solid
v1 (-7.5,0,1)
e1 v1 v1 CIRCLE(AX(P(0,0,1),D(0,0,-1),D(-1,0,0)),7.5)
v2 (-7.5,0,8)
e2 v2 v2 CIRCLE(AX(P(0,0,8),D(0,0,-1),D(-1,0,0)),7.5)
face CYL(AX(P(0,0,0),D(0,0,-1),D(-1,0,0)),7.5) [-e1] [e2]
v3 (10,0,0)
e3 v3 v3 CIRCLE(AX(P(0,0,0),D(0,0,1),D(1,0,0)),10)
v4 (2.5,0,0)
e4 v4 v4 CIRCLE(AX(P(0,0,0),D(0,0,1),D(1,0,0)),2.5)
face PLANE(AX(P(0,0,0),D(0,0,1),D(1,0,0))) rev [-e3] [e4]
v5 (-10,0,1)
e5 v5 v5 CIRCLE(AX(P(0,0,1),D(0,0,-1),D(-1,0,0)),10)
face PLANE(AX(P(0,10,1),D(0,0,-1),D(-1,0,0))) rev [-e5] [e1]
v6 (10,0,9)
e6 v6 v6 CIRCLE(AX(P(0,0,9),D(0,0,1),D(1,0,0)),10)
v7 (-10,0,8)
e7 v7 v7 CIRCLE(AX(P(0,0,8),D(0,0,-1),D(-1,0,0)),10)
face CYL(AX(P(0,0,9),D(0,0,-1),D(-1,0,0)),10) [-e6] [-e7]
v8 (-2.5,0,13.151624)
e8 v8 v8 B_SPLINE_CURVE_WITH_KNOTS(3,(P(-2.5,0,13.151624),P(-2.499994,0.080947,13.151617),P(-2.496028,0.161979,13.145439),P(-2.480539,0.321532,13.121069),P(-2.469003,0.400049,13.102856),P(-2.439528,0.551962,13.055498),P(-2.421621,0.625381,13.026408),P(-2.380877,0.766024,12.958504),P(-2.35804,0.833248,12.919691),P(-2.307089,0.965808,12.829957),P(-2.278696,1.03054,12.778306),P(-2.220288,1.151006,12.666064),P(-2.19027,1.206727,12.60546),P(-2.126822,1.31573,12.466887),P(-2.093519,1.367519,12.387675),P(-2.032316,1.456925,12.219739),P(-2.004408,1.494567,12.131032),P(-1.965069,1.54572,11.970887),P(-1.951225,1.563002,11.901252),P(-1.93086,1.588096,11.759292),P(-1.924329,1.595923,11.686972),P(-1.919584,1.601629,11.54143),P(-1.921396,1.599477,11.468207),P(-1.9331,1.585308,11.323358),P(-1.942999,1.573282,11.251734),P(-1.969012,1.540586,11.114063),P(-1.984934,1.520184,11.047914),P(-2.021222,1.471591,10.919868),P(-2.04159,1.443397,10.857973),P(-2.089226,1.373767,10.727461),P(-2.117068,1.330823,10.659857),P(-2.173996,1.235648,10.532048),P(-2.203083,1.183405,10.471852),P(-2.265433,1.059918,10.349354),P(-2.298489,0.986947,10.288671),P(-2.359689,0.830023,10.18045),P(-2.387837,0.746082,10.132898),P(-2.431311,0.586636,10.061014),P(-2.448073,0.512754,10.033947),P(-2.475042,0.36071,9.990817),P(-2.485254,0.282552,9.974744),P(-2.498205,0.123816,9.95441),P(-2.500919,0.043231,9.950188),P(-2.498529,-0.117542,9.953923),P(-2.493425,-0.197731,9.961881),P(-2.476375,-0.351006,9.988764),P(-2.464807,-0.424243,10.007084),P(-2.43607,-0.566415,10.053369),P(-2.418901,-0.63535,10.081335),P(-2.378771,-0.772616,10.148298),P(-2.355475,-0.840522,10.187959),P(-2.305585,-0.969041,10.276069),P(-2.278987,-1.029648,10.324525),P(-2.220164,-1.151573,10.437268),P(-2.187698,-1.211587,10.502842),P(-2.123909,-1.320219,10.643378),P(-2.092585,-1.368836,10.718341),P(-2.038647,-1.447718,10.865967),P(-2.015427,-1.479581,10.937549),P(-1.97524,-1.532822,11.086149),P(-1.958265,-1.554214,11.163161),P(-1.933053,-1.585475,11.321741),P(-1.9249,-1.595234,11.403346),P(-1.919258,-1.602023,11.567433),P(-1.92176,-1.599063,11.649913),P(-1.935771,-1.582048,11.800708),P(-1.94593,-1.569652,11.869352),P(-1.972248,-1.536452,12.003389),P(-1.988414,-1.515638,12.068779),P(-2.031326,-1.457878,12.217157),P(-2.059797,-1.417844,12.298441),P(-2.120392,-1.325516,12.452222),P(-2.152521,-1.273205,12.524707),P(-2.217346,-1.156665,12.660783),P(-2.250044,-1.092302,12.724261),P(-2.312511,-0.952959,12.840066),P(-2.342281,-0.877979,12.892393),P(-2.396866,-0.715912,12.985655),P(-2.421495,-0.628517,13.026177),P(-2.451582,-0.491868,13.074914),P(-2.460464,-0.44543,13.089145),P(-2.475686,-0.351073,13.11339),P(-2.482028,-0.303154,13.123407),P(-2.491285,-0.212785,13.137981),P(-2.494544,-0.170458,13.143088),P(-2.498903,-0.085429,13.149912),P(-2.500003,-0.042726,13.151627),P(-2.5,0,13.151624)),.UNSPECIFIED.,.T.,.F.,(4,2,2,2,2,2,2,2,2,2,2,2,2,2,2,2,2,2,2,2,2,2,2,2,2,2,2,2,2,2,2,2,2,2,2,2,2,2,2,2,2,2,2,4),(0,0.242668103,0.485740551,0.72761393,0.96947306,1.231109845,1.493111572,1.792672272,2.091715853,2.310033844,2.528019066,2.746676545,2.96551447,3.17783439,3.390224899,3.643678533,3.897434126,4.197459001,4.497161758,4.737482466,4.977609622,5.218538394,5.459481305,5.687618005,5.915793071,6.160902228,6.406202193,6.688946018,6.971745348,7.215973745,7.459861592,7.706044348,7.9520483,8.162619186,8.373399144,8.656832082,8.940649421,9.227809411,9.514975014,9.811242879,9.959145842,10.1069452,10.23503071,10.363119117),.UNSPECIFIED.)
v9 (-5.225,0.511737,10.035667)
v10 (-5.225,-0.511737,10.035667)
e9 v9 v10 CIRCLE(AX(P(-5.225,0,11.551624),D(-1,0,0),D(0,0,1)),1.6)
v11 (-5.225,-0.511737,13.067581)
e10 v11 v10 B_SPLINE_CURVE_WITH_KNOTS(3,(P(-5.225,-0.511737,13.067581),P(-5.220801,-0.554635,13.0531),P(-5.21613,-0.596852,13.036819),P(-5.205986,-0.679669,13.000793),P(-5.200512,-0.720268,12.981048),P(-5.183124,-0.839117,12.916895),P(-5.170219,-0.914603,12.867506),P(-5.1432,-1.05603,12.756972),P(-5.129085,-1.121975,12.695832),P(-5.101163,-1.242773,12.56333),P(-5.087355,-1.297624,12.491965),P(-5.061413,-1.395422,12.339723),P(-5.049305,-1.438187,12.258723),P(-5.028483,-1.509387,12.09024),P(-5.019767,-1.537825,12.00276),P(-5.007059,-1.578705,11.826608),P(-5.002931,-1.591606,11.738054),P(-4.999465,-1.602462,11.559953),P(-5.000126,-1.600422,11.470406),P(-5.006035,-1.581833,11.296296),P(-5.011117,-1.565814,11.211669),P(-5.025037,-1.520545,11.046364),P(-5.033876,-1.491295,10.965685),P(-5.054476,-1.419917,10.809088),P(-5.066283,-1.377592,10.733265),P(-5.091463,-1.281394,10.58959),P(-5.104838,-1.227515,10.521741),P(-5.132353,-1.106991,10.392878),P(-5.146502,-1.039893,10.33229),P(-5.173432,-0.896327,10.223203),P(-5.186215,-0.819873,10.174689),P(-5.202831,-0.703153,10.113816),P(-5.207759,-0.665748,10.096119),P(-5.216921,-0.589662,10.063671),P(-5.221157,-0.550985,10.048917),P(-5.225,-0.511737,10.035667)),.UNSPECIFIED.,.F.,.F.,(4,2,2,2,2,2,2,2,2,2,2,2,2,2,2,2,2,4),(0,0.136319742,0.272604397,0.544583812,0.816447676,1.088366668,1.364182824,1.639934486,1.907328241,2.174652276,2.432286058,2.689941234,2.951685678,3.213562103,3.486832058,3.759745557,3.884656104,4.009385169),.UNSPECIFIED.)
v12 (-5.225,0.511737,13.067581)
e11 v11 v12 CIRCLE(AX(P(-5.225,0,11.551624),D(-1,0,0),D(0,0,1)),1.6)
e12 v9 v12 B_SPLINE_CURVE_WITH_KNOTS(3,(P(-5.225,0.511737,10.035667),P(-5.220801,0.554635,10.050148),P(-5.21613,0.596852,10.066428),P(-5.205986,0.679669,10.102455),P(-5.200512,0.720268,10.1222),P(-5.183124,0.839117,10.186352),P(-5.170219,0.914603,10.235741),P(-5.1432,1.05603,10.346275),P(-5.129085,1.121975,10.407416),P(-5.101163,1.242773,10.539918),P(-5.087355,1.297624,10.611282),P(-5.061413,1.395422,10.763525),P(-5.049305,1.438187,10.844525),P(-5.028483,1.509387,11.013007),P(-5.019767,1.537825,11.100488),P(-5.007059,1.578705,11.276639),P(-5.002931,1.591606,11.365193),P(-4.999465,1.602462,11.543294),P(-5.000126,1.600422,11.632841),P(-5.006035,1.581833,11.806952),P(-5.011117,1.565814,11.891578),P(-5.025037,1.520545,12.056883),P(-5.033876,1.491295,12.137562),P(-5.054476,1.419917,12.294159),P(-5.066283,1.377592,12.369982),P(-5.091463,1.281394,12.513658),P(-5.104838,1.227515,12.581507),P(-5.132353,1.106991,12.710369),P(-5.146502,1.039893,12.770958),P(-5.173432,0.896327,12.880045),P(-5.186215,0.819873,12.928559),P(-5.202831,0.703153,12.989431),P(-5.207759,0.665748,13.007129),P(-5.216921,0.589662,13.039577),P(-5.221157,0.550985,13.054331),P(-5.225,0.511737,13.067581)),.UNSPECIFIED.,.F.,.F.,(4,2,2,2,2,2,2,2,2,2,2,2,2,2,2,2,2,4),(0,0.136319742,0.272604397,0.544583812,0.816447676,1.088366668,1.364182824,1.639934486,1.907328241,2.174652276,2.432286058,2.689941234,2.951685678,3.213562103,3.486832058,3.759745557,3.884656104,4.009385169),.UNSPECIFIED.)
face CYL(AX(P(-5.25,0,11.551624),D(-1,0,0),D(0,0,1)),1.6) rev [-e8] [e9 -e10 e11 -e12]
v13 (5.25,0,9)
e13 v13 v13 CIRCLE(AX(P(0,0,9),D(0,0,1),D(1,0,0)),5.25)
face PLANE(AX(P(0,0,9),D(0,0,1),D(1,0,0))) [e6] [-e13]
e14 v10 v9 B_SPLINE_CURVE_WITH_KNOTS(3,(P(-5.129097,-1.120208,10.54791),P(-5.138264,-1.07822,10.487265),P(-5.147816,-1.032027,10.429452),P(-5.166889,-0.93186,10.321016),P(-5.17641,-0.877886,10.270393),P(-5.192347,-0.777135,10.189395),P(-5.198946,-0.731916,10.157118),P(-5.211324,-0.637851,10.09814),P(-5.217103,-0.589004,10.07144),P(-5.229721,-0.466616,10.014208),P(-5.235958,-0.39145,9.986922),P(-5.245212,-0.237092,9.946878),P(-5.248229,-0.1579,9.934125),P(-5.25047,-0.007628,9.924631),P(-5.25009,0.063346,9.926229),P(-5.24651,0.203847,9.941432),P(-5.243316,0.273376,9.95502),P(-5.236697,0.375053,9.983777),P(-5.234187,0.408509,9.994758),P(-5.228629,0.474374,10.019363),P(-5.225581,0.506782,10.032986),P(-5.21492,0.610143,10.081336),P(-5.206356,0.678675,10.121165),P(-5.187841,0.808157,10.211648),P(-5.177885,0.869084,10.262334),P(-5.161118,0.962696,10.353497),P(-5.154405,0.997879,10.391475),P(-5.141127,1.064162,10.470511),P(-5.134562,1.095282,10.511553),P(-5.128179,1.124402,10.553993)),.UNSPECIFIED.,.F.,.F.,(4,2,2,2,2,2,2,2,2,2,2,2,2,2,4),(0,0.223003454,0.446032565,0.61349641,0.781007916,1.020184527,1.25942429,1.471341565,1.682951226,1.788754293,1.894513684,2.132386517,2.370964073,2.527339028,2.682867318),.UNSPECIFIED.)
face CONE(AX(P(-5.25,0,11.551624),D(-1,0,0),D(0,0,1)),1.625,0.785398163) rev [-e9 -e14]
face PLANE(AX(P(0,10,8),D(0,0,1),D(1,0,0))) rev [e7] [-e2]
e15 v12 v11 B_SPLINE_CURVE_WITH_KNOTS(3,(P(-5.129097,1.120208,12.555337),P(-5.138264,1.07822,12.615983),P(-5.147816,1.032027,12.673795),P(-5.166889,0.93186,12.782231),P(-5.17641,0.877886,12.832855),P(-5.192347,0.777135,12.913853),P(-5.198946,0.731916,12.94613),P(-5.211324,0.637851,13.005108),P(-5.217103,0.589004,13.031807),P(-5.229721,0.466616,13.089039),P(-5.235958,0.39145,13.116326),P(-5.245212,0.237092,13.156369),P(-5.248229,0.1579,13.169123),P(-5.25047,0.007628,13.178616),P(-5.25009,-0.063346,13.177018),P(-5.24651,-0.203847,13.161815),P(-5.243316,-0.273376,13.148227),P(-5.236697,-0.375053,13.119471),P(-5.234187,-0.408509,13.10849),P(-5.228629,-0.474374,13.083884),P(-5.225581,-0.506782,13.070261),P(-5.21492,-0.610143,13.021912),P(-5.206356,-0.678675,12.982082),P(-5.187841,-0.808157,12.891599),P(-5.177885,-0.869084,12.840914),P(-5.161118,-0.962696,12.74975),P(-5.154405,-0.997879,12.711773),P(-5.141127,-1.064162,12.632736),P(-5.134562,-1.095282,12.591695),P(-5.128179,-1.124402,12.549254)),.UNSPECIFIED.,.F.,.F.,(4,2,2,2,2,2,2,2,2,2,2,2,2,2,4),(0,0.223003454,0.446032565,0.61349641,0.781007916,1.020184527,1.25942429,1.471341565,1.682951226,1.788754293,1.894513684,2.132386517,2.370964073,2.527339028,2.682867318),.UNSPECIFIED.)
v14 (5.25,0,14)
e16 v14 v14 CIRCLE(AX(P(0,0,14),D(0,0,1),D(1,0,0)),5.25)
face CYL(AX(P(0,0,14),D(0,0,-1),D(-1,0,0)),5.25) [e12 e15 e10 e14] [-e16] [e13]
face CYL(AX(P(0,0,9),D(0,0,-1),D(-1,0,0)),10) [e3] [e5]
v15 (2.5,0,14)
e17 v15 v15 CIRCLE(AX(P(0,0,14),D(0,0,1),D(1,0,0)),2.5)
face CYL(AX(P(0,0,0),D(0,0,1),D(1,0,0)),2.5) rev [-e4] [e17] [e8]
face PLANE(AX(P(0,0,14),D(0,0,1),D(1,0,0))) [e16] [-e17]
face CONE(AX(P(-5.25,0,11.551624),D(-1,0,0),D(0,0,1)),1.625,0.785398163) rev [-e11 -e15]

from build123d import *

# Parameters (mm, degrees)
ESQUISSE1_R             = 10
BOSS_EXTRU_1_DEPTH      = 9
ESQUISSE2_R             = 5.25
BOSS_EXTRU_2_DEPTH      = 5
ESQUISSE3_R             = 2.5
ENL_V_MAT_EXTRU_1_DEPTH = 20.899748742
ESQUISSE4_W             = 7
ESQUISSE4_H             = 2.5


# Read off the part's stored shape, not the designer's step: Dégagement M31
with BuildPart() as part:
    # Esquisse1 → Boss.-Extru.1 (new body)
    with BuildSketch(Plane.XY):
        Circle(ESQUISSE1_R)
    extrude(amount=BOSS_EXTRU_1_DEPTH)

    # Esquisse2 → Boss.-Extru.2 (add)
    with BuildSketch(Plane.XY.offset(9)):
        Circle(ESQUISSE2_R)
    extrude(amount=BOSS_EXTRU_2_DEPTH)

    # Esquisse3 → Enlèv. mat.-Extru.1 (cut, through all)
    with BuildSketch(Plane.XY.offset(14)):
        Circle(ESQUISSE3_R)
    extrude(amount=-ENL_V_MAT_EXTRU_1_DEPTH, mode=Mode.SUBTRACT)

    # Esquisse4 → Enlèvement de matière-Révolution1 (revolve, cut)
    with BuildSketch(Plane(origin=(0, 0, 0), x_dir=(0, 0, -1), z_dir=(1, 0, 0)), mode=Mode.PRIVATE) as enl_vement_de_mati_re_r_volution1_sk:
        with Locations((-4.5, 8.75)):
            Rectangle(ESQUISSE4_W, ESQUISSE4_H)
    revolve(enl_vement_de_mati_re_r_volution1_sk.sketch.rotate(Axis((0, 0, 0), (0, 0, 1)), 90), axis=Axis((0, 0, 0), (0, 0, 1)), mode=Mode.SUBTRACT)

    # Dégagement M31 outline → Dégagement M31 (revolve, cut)
    with BuildSketch(Plane.YX.offset(-11.551623765)):
        Polygon((1.6, -5.250016412), (1.6, -5.225), (1.6, -1.920645137), (0, -1.920645137), (0, -5.250016412), align=None)
        Polygon((1.625016412, -5.250016412), (1.599998144, -5.224998144), (1.6, -5.250016412), align=None)
    revolve(axis=Axis((0, 0, 11.551623765), (1, 0, 0)), mode=Mode.SUBTRACT)


solid = part.part
